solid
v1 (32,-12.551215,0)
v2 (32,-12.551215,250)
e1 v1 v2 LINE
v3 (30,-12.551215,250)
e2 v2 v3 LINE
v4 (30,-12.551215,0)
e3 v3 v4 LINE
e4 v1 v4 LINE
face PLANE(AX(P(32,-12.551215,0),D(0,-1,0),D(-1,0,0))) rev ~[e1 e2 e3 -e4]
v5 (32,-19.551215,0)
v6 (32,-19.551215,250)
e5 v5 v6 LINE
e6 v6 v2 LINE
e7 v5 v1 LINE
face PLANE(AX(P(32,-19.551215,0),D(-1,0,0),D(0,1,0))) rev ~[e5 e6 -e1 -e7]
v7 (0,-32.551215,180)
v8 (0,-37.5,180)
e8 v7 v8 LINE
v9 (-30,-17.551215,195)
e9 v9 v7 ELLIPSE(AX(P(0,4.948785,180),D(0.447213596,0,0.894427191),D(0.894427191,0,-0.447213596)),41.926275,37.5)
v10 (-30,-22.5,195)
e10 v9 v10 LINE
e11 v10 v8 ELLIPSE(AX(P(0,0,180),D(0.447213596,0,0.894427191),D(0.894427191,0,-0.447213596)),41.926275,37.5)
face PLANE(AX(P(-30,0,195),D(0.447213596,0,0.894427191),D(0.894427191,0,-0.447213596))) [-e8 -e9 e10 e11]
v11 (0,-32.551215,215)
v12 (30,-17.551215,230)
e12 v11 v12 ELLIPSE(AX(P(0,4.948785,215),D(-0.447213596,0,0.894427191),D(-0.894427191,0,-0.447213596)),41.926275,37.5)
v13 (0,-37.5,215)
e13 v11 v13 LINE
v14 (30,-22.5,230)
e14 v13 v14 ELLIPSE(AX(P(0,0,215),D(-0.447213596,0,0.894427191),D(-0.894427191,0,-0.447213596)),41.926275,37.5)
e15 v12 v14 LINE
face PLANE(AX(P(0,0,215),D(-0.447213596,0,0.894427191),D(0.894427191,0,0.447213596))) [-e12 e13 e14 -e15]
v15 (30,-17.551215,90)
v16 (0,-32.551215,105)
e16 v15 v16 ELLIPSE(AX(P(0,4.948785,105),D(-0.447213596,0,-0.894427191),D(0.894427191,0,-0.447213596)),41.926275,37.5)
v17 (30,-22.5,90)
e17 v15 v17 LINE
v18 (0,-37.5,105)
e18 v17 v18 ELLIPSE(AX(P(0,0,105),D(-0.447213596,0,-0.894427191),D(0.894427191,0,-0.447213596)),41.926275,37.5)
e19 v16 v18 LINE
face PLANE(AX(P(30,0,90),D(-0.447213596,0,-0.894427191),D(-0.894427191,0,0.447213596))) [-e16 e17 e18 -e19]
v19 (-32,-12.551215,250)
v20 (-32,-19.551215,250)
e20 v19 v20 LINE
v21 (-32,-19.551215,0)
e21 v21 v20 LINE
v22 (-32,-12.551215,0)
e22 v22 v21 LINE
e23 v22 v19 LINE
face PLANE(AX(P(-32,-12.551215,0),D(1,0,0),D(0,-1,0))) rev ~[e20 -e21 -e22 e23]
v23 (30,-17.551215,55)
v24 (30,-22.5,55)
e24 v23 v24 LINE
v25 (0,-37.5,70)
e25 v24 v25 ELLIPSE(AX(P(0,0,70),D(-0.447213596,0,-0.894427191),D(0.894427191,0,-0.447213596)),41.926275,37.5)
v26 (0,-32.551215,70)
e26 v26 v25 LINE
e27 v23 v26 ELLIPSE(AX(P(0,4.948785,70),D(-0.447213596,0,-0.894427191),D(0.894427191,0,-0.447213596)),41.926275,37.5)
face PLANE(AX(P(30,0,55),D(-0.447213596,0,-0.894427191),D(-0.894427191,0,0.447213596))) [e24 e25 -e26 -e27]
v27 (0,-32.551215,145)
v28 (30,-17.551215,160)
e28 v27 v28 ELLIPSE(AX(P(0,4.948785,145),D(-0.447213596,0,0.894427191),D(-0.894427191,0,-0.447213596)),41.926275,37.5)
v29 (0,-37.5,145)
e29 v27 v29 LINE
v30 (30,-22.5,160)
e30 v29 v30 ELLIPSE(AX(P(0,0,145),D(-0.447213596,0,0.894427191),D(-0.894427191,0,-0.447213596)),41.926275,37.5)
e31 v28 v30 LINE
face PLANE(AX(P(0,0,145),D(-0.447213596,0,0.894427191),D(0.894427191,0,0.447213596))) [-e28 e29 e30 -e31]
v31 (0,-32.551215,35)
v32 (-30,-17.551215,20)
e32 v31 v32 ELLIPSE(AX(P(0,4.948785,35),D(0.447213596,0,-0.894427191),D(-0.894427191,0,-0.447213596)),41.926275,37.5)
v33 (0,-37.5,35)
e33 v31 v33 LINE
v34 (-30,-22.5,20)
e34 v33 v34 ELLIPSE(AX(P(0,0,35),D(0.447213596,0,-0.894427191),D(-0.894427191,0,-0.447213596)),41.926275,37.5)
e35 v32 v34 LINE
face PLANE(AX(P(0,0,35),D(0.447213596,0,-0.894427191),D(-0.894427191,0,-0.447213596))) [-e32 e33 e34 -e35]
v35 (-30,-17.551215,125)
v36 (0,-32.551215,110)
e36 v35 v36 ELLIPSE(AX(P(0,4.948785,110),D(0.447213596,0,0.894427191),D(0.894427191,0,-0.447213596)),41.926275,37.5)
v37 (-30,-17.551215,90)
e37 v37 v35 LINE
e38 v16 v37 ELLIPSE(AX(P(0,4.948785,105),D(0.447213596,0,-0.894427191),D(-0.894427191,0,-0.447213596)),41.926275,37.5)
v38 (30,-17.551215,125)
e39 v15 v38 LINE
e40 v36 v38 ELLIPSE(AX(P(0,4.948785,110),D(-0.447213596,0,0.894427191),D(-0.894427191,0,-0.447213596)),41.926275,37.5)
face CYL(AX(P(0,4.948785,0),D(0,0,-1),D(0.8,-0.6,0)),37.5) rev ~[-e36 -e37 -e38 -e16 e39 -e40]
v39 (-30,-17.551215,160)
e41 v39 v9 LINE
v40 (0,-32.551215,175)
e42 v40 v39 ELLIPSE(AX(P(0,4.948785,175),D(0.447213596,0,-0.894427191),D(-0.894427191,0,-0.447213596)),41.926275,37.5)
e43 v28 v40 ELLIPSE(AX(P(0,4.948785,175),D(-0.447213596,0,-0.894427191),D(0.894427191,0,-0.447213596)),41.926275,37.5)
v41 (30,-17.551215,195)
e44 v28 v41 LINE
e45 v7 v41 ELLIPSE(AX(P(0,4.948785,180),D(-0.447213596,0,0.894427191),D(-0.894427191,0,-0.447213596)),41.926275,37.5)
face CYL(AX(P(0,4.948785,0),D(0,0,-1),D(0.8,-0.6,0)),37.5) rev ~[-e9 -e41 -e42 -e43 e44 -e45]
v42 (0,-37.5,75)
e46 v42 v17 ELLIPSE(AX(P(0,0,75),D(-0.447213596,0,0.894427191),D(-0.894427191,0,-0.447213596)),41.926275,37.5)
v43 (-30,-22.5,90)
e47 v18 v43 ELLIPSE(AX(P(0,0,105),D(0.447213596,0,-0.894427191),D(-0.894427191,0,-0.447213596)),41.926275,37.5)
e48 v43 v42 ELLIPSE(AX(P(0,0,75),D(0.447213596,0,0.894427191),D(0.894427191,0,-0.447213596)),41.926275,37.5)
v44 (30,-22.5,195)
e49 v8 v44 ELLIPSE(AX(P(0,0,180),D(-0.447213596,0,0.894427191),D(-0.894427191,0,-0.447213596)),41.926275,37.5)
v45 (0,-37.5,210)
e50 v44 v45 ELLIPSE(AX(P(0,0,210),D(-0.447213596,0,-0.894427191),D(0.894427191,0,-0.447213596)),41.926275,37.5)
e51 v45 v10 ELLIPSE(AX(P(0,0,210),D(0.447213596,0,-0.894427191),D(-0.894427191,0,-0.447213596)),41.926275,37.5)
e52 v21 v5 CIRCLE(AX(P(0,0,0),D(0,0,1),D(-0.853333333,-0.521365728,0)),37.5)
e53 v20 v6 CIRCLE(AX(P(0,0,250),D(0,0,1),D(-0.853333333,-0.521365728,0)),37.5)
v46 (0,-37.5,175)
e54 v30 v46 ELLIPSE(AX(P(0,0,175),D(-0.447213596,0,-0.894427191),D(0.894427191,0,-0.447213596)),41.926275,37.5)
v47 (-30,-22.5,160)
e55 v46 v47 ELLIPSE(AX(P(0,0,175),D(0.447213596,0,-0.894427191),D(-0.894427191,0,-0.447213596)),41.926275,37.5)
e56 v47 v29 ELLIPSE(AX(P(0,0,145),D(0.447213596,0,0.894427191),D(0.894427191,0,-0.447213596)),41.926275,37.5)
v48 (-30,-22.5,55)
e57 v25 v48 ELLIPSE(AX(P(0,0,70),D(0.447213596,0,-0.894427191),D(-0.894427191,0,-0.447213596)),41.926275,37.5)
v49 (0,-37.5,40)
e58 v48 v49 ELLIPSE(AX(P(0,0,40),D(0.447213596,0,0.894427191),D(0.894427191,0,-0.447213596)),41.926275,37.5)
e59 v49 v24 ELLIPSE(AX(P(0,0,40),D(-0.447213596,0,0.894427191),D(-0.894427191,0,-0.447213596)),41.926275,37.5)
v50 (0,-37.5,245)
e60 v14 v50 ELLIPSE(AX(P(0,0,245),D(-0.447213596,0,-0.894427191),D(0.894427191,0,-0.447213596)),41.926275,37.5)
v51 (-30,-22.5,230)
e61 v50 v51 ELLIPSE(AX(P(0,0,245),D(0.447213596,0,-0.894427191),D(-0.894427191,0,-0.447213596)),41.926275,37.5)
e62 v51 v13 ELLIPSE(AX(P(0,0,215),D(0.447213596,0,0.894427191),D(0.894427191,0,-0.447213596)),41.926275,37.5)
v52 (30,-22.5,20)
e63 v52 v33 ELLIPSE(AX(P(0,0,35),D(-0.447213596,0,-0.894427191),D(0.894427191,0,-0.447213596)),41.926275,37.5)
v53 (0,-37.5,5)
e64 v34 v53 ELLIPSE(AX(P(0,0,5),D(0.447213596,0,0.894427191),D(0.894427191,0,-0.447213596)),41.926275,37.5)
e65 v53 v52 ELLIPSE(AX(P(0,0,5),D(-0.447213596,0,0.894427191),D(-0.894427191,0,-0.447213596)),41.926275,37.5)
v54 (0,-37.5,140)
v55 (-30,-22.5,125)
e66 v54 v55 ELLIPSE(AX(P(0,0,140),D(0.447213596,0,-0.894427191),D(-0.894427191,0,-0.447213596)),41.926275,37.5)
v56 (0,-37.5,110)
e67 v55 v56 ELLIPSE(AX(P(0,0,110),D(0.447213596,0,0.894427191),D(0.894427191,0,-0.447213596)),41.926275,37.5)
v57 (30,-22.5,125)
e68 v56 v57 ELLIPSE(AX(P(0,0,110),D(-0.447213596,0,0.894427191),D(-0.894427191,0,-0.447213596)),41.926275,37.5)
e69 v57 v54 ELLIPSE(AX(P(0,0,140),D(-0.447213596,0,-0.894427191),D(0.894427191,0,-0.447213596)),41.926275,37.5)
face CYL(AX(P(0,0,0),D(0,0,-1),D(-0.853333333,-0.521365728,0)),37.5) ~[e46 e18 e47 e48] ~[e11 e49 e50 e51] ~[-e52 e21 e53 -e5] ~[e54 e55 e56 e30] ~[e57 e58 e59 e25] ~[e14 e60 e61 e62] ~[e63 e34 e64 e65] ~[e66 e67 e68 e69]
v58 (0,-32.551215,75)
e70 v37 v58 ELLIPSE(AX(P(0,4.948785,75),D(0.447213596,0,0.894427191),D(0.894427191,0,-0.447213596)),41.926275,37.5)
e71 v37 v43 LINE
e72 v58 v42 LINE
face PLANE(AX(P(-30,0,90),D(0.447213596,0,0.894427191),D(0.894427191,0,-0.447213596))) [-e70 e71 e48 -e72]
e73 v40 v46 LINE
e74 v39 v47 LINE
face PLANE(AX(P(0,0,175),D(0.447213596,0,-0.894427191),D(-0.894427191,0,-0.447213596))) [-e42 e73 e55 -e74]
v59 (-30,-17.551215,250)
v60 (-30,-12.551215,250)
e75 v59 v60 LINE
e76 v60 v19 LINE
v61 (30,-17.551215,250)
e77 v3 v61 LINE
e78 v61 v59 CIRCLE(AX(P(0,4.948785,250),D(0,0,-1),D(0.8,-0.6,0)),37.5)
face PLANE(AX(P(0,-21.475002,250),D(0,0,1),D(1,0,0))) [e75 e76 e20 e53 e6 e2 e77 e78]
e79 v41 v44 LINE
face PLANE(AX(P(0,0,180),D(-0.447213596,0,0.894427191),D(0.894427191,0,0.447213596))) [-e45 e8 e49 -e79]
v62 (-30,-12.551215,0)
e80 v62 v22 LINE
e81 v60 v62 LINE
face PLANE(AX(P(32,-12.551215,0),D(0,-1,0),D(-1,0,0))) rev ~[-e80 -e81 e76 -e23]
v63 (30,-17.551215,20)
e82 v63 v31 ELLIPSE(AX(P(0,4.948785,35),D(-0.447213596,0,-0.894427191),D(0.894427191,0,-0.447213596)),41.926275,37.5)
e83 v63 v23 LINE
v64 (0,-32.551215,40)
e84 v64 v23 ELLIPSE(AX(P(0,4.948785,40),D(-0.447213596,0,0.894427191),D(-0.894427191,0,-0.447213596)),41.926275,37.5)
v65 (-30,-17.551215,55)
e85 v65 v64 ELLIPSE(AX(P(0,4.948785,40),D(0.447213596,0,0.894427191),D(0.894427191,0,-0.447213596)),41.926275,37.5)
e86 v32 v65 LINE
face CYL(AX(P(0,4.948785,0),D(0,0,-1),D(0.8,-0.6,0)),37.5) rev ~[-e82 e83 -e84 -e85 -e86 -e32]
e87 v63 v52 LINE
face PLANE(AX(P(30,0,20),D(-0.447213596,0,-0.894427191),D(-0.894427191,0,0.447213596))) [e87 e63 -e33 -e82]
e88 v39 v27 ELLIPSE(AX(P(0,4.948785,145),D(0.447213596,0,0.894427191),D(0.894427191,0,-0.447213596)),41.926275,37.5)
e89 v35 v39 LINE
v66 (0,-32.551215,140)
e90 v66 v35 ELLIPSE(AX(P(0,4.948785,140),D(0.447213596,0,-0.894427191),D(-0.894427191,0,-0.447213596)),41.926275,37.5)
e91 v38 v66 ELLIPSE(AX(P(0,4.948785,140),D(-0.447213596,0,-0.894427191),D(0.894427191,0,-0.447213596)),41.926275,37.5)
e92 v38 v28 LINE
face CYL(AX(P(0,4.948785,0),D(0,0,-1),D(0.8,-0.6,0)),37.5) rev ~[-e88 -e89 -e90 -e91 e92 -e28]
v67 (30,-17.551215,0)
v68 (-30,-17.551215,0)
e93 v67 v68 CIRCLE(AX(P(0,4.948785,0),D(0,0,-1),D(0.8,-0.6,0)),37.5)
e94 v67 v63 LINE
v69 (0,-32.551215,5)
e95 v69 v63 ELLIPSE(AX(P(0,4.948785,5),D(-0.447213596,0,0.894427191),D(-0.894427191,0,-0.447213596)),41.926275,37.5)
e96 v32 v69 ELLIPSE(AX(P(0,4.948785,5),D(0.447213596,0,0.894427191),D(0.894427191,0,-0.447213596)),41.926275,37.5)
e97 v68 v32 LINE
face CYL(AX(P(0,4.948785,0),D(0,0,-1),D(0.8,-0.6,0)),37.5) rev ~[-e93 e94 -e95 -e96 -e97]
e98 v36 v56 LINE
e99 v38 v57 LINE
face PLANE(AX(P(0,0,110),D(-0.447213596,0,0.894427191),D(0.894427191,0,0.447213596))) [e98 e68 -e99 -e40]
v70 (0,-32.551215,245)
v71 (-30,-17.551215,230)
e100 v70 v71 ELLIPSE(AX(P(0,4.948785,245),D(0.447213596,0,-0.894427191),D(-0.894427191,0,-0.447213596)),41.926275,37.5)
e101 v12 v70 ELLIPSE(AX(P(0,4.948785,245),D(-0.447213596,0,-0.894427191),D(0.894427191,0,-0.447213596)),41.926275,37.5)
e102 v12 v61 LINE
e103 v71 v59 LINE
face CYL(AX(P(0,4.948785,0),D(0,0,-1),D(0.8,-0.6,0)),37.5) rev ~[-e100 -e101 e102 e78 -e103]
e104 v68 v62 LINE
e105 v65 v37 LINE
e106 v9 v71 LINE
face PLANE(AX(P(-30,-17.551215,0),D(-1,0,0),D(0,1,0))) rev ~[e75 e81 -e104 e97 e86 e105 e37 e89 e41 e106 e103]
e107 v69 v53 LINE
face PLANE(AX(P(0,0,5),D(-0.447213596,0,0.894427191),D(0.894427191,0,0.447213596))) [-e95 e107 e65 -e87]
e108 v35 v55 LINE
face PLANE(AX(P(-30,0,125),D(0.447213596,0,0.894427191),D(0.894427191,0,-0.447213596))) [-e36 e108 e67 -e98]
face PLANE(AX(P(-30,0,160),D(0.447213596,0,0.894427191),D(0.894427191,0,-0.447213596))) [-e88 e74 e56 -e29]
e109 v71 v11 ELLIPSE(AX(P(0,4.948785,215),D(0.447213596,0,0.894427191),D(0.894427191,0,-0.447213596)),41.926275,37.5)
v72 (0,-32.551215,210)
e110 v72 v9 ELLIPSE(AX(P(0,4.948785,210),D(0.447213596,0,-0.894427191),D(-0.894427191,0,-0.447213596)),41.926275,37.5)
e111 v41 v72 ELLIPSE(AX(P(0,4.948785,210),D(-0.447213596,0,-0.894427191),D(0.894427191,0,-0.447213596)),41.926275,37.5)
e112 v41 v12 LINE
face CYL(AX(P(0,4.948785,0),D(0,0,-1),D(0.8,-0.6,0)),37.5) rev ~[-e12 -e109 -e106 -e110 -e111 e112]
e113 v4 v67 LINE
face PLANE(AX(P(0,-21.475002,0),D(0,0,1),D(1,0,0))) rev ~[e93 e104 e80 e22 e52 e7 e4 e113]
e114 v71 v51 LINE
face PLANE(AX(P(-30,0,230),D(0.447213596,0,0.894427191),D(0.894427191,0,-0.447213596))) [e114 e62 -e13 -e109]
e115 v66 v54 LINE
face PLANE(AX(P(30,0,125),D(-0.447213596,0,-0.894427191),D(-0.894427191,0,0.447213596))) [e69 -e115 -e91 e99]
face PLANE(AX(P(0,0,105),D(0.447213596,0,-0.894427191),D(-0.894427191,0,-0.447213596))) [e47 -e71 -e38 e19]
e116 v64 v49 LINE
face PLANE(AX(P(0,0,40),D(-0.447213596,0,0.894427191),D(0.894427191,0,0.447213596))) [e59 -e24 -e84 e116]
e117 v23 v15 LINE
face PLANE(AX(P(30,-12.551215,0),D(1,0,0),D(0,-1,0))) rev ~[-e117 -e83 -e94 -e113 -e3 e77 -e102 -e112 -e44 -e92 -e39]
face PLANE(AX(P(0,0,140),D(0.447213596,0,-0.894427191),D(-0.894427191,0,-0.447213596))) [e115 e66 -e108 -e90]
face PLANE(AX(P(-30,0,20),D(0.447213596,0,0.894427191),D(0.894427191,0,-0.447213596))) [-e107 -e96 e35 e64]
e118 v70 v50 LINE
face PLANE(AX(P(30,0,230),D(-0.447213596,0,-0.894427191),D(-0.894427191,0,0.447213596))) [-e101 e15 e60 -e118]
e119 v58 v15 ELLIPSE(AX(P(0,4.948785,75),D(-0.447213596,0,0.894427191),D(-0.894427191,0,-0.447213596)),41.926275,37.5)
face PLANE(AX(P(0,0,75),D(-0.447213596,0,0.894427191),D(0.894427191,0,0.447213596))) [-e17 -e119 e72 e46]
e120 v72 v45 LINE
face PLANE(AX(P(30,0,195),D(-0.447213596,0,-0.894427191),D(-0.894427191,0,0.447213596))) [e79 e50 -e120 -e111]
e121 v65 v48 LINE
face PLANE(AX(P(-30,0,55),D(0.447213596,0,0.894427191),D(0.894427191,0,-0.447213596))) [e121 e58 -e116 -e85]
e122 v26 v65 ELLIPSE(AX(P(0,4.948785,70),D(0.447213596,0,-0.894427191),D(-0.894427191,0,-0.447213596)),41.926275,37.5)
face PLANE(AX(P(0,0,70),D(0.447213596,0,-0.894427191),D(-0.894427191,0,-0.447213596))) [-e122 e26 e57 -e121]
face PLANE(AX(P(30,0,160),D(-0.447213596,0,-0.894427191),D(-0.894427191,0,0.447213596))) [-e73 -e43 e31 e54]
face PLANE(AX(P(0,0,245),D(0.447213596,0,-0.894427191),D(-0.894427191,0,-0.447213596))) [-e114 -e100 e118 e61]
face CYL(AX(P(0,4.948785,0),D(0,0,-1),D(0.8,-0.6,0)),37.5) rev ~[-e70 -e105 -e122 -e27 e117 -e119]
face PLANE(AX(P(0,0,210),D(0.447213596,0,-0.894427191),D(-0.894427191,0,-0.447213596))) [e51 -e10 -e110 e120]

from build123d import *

# Parameters (mm, degrees)
F1_DEPTH = 250
F3_DEPTH = 250
F5_DEPTH = 37.501


# Not quite as in the source:
# - a feature names something its author has since deleted; it is built from what else it names


with BuildPart() as f1:
    # F0 (on Top) → F1 (new body)
    with BuildSketch(Plane.XY):
        with BuildLine():
            Line((-32, -12.551214796), (-32, -19.551214796))
            ThreePointArc((-32, -19.551214796), (0, -37.5), (32, -19.551214796))
            Line((32, -19.551214796), (32, -12.551214796))
            Line((32, -12.551214796), (0, -12.551214796))
            Line((0, -12.551214796), (-32, -12.551214796))
        make_face()
    extrude(amount=F1_DEPTH)

    # F2 (on face) → F3 (cut)
    with BuildSketch(Plane(origin=(0, 0, 0), x_dir=(1, 0, 0), z_dir=(0, 0, -1))):
        with BuildLine():
            Line((-30, 12.551214796), (30, 12.551214796))
            Line((30, 12.551214796), (30, 17.551214796))
            ThreePointArc((30, 17.551214796), (0, 32.551214796), (-30, 17.551214796))
            Line((-30, 17.551214796), (-30, 12.551214796))
        make_face()
    extrude(amount=-F3_DEPTH, mode=Mode.SUBTRACT)

    # F4 (on Front) → F5 (cut, through all)
    with BuildSketch(Plane.XZ):
        Polygon((-30, 20), (0, 5), (30, 20), (0, 35), align=None)
        Polygon((0, 40), (30, 55), (0, 70), (-30, 55), align=None)
        Polygon((0, 110), (30, 125), (0, 140), (-30, 125), align=None)
        Polygon((0, 145), (30, 160), (0, 175), (-30, 160), align=None)
        Polygon((0, 180), (30, 195), (0, 210), (-30, 195), align=None)
        Polygon((0, 215), (30, 230), (0, 245), (-30, 230), align=None)
        Polygon((0, 75), (30, 90), (0, 105), (-30, 90), align=None)
    extrude(amount=F5_DEPTH, mode=Mode.SUBTRACT)


solid = f1.part
